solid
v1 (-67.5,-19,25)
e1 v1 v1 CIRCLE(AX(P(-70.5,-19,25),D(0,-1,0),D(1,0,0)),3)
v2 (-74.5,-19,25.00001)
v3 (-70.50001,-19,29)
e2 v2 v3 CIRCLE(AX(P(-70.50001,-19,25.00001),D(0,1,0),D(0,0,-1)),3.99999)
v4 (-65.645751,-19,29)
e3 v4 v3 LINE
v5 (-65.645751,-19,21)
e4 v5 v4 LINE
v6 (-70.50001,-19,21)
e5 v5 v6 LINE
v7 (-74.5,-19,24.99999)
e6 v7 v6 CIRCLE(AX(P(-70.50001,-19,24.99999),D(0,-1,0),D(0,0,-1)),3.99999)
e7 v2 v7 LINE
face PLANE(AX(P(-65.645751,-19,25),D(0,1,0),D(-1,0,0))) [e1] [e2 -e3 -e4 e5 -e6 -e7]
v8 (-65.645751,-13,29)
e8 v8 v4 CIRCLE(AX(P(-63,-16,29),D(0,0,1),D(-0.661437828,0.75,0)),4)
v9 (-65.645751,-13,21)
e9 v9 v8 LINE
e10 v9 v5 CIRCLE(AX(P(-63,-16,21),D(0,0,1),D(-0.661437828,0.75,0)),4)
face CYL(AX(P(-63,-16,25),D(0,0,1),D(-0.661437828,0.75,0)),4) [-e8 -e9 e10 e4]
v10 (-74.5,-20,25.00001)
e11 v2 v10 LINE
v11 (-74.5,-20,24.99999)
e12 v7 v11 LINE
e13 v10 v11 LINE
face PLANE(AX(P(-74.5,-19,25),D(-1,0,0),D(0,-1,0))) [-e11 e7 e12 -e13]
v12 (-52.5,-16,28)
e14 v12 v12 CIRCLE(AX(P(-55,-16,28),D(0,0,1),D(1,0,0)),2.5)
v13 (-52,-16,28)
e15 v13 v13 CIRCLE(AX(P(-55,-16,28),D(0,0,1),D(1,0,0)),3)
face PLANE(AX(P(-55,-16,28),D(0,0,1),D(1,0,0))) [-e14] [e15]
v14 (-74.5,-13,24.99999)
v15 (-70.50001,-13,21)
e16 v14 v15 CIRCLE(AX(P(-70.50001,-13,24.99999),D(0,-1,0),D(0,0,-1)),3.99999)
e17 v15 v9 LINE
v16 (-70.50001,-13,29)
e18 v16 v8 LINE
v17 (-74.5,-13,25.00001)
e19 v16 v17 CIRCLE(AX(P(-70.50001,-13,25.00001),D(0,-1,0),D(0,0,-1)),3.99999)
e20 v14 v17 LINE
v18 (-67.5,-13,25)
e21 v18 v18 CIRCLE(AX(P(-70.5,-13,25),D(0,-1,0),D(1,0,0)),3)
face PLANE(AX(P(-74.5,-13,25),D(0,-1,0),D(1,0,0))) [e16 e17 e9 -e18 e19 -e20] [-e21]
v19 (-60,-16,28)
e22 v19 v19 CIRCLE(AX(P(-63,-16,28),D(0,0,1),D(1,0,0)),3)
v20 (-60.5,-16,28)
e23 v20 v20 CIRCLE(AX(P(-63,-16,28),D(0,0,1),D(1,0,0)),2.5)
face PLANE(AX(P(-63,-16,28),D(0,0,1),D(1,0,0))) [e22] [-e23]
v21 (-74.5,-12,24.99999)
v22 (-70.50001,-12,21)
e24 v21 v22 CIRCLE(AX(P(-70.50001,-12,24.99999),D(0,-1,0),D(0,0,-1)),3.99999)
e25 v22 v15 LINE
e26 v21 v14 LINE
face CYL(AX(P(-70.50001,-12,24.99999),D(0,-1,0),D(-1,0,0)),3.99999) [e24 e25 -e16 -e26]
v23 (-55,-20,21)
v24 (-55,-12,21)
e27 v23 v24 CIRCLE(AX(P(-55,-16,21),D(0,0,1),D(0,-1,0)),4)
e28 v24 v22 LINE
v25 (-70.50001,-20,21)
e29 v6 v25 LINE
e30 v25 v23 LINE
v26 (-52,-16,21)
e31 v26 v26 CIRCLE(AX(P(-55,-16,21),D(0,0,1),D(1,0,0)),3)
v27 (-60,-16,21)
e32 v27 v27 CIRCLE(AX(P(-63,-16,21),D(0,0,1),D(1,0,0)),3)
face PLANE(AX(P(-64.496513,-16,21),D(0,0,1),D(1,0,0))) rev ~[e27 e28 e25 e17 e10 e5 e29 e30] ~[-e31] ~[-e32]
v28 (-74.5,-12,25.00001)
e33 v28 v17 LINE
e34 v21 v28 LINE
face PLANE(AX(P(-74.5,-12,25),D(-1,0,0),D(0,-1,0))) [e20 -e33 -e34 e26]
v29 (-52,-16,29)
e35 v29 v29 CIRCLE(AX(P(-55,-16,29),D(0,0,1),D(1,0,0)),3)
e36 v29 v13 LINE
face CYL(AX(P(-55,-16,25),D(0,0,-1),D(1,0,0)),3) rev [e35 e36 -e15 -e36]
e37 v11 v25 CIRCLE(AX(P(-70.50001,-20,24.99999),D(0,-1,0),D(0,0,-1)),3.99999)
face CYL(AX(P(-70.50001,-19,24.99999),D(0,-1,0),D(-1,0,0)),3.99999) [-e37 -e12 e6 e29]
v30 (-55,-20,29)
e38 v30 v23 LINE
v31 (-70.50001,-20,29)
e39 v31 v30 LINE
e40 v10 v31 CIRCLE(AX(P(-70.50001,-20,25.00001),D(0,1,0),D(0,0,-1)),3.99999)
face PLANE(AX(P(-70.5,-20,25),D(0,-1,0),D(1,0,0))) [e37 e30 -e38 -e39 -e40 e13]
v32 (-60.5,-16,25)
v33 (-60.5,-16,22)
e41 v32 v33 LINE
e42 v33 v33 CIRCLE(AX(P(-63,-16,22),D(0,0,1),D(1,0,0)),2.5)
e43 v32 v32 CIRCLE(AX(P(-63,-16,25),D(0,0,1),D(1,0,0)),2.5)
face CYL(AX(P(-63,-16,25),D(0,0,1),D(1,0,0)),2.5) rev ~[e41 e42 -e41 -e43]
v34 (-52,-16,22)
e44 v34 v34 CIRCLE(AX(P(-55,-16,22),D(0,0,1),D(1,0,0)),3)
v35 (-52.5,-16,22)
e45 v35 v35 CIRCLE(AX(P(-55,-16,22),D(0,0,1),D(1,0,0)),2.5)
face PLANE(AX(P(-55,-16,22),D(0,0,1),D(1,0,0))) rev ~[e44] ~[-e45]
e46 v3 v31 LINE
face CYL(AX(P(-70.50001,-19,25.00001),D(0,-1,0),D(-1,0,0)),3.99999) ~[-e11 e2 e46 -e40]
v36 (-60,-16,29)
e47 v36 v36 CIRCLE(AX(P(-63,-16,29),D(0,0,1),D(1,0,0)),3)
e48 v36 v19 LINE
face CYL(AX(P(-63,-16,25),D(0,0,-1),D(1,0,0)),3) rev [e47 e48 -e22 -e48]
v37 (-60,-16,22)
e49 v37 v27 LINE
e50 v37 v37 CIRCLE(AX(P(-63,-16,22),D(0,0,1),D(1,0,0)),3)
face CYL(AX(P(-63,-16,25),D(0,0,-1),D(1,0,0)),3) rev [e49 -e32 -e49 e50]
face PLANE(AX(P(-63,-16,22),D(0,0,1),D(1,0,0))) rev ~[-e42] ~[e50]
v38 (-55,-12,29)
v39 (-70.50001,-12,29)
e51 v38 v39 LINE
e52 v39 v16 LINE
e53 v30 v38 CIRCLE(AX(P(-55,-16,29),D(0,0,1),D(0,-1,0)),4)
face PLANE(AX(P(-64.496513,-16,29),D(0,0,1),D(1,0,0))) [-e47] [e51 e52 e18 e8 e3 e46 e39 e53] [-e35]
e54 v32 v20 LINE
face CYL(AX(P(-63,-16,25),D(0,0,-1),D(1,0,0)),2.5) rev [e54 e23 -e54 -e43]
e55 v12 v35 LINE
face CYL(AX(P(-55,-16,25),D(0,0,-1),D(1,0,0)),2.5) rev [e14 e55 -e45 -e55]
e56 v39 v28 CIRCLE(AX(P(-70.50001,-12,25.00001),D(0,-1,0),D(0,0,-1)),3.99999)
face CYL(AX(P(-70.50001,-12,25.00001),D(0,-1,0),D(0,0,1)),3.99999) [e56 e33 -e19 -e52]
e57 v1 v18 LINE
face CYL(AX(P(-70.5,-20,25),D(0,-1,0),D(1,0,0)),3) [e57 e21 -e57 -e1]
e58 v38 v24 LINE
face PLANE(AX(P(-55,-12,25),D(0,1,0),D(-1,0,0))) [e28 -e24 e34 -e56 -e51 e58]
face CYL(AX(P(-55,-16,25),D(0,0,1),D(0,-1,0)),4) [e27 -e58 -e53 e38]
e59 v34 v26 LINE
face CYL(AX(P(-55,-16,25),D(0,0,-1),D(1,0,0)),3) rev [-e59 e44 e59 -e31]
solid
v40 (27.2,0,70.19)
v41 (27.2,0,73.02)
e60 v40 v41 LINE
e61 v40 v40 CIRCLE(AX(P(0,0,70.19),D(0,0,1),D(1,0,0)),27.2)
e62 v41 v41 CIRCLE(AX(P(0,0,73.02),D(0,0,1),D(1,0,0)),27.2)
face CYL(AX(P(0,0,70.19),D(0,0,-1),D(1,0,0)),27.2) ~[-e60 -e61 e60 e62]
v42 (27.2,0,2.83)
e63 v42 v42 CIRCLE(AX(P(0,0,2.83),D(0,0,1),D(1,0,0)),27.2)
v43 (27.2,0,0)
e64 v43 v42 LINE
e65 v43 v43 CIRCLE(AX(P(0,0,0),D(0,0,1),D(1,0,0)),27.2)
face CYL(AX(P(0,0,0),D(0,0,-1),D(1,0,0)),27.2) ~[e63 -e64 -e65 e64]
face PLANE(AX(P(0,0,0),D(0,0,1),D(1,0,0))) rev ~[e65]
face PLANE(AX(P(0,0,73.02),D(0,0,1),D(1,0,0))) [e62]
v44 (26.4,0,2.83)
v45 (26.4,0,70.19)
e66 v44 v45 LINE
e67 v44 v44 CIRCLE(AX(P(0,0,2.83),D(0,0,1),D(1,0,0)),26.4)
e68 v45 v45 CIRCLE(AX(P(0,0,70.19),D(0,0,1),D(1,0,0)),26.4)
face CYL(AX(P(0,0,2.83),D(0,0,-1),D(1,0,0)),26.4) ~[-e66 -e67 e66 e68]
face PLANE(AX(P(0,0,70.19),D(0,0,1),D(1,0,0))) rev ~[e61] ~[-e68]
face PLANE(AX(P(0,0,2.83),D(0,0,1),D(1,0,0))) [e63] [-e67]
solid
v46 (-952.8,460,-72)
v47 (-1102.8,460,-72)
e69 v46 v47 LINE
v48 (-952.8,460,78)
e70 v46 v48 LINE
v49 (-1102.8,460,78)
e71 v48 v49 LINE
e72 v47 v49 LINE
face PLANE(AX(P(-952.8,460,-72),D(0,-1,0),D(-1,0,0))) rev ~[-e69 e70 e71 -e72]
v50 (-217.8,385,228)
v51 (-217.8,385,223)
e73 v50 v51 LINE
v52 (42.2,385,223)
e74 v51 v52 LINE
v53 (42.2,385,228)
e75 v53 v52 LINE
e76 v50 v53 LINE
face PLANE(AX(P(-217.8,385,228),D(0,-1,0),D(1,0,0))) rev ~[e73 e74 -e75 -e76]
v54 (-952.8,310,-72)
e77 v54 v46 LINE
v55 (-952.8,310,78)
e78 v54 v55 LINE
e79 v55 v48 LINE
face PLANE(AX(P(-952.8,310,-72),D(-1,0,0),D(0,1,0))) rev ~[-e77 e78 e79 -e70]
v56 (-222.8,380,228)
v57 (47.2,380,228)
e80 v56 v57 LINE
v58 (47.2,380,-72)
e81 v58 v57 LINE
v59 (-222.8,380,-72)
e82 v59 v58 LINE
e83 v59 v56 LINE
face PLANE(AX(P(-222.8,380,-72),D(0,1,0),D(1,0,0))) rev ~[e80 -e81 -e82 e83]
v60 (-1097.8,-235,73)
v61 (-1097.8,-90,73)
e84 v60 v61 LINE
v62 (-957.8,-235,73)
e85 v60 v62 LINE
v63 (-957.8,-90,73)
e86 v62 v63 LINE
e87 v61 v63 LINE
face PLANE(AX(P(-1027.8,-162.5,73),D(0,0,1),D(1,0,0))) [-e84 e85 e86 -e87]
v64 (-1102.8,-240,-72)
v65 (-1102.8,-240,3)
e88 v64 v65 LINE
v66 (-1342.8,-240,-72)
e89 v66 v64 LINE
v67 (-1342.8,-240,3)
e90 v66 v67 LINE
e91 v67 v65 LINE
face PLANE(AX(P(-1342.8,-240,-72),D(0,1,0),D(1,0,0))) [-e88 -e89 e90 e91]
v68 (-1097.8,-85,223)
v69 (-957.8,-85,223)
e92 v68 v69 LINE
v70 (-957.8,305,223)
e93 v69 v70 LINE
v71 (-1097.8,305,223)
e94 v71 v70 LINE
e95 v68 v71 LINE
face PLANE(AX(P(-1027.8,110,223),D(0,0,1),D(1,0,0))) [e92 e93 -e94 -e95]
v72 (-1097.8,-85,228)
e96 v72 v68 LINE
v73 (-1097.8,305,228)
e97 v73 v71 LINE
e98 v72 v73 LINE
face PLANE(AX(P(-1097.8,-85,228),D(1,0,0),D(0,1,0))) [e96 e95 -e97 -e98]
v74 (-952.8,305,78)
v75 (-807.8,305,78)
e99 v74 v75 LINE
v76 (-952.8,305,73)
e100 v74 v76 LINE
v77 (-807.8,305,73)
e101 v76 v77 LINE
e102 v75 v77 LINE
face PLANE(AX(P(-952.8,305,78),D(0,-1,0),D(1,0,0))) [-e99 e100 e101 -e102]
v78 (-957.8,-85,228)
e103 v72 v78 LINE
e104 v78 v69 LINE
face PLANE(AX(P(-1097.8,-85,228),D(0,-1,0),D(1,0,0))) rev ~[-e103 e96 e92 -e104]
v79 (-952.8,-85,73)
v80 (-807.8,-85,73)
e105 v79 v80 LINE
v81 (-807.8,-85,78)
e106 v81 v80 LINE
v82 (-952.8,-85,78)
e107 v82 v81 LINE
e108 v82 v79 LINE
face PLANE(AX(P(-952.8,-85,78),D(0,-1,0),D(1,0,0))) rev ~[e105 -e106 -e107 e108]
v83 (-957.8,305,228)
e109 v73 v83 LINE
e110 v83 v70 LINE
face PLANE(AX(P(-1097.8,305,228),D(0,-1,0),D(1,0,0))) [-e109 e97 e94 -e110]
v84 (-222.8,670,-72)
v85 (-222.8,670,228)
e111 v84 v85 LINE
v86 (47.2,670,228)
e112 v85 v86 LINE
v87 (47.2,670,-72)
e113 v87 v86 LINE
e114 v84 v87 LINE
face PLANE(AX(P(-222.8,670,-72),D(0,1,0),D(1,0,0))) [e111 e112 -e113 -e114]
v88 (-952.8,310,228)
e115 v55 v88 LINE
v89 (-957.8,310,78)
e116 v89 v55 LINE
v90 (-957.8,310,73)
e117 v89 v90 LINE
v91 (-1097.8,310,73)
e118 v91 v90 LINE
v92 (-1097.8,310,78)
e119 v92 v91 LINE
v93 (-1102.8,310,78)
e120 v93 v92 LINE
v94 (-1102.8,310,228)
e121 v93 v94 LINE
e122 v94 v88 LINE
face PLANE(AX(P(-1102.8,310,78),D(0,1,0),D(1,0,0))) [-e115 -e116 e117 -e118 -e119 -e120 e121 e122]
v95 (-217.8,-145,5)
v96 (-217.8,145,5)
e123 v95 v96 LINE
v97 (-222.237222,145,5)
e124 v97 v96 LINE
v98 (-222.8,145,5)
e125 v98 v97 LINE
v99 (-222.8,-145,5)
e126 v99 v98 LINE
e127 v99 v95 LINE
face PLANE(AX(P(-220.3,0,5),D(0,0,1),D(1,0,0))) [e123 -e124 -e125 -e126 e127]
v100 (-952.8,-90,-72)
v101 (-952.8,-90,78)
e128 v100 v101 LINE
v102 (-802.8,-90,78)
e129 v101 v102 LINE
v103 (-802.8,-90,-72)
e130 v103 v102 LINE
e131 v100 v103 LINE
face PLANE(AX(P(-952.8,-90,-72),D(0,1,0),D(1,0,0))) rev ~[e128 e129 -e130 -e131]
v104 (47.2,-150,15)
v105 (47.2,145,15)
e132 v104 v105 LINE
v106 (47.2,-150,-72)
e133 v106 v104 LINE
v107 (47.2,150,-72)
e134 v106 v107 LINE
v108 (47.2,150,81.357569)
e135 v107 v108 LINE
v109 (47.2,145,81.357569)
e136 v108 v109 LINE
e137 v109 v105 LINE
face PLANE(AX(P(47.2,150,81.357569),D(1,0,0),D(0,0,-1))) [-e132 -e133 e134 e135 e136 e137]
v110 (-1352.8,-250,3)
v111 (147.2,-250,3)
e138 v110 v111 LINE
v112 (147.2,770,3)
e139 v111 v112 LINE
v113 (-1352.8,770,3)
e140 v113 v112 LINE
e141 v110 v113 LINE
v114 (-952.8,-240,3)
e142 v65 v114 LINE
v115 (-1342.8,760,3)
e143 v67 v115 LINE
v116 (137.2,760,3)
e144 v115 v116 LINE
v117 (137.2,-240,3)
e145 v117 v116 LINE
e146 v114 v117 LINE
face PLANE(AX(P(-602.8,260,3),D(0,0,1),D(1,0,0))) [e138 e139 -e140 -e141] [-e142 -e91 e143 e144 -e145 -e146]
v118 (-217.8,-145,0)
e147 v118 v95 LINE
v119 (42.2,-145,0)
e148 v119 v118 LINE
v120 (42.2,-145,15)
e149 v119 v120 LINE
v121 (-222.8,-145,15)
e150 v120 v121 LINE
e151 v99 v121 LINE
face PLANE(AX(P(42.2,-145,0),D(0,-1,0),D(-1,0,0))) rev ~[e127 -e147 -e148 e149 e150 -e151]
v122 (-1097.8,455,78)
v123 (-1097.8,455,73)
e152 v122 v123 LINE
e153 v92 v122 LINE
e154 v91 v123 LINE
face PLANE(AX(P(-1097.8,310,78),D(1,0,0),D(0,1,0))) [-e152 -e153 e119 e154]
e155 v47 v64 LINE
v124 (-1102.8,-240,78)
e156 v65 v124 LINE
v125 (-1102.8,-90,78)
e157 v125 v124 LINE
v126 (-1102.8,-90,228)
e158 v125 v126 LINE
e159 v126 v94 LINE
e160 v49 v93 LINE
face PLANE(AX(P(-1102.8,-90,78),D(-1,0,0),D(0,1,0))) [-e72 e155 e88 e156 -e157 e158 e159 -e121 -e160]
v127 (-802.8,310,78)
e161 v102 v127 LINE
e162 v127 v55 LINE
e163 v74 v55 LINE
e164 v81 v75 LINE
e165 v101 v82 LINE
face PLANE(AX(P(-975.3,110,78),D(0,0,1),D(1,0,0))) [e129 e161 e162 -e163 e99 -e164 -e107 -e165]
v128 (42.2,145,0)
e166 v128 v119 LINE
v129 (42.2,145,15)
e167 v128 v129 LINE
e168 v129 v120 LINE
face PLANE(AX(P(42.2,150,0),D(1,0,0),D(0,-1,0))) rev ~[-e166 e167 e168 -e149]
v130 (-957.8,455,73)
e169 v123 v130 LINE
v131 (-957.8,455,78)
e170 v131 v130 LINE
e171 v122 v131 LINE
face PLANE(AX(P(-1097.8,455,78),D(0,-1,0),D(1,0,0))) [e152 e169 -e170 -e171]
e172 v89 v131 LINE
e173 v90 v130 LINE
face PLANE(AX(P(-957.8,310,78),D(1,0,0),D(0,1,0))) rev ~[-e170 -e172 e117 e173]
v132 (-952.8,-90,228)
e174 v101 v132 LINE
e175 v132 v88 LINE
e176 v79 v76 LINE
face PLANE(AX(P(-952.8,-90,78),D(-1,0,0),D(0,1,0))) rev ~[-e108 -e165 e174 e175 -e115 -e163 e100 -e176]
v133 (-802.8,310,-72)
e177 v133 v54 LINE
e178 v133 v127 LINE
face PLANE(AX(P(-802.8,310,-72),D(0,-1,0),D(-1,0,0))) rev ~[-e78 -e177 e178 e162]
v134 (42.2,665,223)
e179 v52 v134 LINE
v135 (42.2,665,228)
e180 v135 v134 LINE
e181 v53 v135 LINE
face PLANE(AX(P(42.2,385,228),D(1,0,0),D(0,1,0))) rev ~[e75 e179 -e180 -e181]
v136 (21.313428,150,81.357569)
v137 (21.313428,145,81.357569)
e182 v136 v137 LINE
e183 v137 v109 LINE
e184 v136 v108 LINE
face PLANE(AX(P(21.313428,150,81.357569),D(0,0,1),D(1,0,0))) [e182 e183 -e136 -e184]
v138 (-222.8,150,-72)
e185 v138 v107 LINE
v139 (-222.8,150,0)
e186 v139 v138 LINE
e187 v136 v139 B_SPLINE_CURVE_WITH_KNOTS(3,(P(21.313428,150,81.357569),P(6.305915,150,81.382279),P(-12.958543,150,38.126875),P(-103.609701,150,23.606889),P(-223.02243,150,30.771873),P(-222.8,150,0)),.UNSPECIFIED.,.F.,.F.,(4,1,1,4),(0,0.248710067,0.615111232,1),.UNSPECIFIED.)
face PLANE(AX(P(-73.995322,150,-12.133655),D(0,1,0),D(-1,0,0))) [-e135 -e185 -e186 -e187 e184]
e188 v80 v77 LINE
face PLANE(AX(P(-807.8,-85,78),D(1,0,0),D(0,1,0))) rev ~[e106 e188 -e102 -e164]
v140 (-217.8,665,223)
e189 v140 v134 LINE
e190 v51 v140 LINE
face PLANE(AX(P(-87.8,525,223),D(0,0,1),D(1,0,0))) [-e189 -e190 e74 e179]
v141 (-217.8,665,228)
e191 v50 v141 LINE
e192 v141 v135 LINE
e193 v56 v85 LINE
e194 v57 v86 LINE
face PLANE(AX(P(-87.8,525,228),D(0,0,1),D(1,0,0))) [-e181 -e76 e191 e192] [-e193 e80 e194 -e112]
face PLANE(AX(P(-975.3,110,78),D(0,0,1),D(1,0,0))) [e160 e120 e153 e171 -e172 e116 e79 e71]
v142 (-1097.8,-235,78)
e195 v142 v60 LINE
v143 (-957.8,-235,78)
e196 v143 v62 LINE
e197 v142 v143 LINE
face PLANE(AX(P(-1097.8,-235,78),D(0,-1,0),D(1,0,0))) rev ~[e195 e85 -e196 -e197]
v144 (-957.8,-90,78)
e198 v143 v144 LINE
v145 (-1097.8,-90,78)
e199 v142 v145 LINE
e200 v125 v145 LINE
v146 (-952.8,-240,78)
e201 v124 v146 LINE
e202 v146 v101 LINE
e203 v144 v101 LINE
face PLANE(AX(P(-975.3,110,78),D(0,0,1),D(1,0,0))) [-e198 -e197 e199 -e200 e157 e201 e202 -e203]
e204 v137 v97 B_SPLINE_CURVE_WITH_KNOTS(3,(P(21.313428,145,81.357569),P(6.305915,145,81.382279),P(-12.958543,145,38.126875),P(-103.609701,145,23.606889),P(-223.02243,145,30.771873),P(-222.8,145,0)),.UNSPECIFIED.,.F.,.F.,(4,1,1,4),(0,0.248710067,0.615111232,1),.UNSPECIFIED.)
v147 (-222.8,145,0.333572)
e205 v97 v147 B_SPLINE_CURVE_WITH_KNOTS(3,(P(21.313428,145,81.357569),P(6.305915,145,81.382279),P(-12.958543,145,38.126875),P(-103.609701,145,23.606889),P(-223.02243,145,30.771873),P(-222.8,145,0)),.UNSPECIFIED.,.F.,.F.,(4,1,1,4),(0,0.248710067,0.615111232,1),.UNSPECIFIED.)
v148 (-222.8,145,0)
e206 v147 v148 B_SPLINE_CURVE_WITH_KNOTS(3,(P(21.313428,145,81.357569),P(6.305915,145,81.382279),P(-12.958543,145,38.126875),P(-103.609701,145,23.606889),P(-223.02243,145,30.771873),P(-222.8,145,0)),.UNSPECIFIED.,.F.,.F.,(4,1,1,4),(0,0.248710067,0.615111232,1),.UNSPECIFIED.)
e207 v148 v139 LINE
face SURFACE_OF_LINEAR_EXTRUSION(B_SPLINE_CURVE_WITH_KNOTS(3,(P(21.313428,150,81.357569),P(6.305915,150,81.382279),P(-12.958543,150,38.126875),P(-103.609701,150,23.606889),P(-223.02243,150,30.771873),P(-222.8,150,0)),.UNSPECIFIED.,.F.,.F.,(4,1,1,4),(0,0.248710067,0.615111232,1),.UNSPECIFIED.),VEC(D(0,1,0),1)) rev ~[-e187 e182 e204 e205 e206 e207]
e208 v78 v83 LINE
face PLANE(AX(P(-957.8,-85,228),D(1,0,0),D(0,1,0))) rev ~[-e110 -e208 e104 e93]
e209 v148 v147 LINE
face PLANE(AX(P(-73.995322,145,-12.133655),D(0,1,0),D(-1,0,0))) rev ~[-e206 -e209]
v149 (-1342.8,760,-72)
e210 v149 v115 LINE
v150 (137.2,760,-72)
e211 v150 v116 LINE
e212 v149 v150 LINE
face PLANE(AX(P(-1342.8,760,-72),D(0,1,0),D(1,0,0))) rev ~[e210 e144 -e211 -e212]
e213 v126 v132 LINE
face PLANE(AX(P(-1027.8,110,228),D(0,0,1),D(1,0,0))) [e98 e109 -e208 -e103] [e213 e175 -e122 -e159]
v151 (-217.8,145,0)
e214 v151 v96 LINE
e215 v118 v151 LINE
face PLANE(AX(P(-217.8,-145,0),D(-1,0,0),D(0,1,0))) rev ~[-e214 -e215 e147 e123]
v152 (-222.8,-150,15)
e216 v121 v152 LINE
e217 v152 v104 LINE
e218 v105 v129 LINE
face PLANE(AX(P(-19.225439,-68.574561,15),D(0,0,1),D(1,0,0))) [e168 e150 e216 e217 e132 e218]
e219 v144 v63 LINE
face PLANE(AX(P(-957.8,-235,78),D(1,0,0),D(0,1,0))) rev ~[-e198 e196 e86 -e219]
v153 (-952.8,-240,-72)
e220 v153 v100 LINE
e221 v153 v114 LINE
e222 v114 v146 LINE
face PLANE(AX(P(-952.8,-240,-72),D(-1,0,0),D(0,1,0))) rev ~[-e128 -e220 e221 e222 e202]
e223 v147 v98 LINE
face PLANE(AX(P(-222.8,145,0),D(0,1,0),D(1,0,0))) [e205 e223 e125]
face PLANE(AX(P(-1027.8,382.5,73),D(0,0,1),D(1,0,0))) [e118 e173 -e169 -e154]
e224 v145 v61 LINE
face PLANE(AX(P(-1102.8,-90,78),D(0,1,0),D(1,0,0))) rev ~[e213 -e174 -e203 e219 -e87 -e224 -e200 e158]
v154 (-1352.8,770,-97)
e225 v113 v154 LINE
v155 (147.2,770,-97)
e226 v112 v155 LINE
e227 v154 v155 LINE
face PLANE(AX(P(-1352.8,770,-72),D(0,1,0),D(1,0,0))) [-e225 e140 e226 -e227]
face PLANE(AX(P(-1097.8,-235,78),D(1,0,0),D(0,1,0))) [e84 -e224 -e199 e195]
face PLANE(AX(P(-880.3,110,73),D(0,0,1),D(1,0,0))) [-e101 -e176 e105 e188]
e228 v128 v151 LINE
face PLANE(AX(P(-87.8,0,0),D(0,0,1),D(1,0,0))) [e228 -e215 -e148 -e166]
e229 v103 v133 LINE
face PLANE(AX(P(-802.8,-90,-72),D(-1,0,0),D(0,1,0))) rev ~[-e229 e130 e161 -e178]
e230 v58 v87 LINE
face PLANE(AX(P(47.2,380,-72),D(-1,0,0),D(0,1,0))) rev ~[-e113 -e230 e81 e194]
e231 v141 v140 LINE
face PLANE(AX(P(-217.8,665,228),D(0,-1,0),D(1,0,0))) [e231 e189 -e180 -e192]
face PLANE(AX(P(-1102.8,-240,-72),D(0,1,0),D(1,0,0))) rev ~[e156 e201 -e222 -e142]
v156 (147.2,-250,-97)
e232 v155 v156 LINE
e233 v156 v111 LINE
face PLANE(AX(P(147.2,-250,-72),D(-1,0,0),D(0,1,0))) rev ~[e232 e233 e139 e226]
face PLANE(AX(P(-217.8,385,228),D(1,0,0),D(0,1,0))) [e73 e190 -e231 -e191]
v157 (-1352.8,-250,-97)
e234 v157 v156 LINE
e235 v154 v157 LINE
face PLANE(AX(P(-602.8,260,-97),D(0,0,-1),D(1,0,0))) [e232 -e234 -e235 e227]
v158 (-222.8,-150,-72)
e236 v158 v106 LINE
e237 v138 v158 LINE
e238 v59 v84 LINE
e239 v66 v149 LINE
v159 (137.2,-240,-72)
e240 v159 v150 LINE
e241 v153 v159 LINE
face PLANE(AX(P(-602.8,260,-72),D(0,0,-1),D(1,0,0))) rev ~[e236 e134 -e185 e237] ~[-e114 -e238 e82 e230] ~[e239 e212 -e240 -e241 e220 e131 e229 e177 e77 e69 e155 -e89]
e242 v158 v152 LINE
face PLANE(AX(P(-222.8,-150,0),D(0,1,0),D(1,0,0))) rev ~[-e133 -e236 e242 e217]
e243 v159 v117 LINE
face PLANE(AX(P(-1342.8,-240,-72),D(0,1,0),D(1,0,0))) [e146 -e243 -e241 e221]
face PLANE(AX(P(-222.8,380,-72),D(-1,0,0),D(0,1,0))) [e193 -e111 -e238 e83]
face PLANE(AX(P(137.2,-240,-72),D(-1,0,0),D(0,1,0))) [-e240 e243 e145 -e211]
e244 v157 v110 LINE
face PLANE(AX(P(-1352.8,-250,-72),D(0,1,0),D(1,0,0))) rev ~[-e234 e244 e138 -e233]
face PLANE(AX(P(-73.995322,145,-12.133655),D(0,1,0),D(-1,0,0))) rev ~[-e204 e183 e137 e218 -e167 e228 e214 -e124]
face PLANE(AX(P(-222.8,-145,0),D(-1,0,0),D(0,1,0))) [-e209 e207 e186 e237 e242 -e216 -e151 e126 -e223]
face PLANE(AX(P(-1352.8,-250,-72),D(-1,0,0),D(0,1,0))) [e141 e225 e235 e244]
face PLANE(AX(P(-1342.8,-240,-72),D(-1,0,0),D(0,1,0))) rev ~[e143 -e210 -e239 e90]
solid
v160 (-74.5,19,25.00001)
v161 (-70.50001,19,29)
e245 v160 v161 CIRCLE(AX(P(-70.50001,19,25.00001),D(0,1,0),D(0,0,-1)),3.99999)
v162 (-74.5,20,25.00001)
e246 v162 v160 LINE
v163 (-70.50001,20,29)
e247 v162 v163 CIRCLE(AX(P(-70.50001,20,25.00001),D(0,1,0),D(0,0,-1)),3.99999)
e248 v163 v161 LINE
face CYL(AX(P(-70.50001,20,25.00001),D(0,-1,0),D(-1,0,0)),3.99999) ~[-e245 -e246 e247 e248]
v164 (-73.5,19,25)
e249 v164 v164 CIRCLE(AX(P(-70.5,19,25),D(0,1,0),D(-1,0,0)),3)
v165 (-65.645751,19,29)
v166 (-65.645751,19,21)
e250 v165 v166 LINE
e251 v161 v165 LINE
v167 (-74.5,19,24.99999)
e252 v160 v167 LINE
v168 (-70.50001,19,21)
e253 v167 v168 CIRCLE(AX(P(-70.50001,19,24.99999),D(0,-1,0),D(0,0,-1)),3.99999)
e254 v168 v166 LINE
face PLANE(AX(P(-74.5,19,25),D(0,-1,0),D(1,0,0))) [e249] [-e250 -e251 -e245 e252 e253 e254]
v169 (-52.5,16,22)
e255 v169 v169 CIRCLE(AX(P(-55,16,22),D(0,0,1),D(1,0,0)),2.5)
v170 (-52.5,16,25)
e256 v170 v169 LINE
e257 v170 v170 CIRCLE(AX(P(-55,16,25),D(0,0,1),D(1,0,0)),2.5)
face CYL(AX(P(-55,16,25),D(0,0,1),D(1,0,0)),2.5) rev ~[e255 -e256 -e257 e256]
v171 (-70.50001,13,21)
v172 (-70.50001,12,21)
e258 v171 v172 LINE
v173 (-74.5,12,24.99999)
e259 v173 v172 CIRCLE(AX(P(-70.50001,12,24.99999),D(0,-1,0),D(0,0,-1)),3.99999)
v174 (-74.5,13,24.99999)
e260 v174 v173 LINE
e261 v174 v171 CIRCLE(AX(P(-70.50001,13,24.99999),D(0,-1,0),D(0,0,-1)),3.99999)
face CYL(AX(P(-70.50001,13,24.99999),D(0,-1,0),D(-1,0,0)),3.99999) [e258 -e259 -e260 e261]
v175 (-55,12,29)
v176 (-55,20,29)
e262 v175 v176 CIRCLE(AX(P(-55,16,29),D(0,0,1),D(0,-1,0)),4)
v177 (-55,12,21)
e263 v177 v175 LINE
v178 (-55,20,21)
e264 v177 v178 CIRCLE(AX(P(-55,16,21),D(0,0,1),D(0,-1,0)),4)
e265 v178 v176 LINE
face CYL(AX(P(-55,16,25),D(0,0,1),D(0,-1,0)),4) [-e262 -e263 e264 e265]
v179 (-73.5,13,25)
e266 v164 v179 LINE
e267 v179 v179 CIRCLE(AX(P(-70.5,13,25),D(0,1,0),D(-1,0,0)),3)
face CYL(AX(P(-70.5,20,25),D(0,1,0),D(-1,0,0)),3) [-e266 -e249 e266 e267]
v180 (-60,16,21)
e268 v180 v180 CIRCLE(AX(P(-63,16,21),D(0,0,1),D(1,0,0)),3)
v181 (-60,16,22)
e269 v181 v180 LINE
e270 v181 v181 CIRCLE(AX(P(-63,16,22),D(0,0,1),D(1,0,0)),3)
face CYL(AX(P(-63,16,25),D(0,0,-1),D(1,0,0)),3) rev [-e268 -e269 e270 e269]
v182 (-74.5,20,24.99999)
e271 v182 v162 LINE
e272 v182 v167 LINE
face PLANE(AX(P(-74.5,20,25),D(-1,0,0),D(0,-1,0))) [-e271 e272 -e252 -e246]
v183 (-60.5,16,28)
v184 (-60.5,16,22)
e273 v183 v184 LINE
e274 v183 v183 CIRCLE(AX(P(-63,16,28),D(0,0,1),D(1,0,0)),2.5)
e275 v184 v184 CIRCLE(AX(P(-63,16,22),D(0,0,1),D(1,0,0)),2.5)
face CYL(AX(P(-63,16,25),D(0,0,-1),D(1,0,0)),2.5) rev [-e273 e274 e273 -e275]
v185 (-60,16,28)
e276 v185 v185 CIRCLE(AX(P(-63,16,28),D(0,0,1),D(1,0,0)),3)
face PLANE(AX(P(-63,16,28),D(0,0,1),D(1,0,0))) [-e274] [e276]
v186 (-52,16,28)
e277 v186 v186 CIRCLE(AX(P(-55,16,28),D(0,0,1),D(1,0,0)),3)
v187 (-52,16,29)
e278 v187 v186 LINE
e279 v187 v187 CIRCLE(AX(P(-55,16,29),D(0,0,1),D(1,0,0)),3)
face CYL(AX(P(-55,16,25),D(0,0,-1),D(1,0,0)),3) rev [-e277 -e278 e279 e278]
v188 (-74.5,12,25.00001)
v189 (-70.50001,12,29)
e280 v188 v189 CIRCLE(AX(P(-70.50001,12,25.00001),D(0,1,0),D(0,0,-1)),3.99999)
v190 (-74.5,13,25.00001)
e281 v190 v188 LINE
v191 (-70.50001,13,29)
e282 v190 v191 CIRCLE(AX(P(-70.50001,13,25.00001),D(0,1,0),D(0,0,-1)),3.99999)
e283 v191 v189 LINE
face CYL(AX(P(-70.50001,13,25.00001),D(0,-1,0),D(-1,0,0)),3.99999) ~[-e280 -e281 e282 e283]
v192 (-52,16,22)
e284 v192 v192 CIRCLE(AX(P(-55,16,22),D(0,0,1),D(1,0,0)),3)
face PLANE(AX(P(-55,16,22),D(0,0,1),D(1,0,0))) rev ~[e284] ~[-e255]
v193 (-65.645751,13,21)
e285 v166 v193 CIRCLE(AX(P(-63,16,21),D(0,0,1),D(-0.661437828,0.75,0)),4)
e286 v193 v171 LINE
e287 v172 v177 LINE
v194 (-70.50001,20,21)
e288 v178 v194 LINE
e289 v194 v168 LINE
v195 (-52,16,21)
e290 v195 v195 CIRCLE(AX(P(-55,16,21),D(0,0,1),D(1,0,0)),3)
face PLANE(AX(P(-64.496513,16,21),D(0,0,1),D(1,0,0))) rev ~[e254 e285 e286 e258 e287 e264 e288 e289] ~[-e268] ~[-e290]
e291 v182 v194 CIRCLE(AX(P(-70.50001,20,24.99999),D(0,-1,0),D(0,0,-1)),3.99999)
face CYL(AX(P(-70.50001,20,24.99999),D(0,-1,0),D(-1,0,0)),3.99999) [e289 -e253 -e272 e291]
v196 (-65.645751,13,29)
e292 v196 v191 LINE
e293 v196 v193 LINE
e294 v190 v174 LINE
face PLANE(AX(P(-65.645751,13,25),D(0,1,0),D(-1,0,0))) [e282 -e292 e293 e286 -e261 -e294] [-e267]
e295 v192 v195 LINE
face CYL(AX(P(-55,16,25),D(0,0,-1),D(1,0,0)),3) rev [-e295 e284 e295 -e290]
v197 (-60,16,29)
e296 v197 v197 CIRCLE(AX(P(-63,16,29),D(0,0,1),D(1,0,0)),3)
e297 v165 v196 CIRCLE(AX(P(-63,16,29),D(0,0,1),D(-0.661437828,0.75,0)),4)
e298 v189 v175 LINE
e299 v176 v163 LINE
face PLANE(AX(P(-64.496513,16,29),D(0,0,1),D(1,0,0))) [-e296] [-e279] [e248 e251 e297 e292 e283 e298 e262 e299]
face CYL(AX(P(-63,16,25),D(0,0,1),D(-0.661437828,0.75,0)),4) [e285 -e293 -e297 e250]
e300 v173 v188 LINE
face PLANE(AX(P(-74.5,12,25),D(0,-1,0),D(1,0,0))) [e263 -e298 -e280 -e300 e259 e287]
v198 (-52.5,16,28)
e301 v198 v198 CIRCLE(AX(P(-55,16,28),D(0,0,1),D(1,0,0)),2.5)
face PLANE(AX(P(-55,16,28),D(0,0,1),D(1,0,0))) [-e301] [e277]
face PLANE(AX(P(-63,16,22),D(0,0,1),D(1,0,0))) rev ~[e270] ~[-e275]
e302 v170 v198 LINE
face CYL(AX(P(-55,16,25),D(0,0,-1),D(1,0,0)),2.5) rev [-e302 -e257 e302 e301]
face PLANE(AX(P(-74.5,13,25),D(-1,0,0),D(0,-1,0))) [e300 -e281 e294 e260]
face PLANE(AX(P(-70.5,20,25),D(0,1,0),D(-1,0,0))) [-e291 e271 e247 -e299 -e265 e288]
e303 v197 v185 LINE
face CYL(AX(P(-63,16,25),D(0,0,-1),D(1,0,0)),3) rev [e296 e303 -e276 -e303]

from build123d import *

# Parameters (mm, degrees)
F0_R      = 27.2
F1_DEPTH  = 2.83
F2_R      = 26.4
F3_DEPTH  = 67.36
F4_R      = 27.2
F5_DEPTH  = 2.83
F8_W      = 270
F8_H      = 300
F9_DEPTH  = 72
F11_DEPTH = 15
F13_DEPTH = 5
F14_W     = 5
F14_H     = 290
F15_DEPTH = 5
F16_W     = 1500
F16_H     = 1020
F17_DEPTH = 25
F18_W     = 270
F18_H     = 290
F19_DEPTH = 300
F20_W     = 260
F20_H     = 280
F21_DEPTH = 5
F22_W     = 1500
F22_H     = 1020
F22_W_2   = 1480
F22_H_2   = 1000
F23_DEPTH = 75
F25_DEPTH = 150
F26_W     = 150
F26_H     = 400
F27_DEPTH = 150
F28_W     = 140
F28_H     = 390
F29_DEPTH = 5
F30_W     = 140
F30_H     = 145
F30_W_2   = 145
F30_H_2   = 390
F31_DEPTH = 5
F32_R     = 3
F33_DEPTH = 4
F34_R     = 3.99999
F34_2_R   = 3.99999
F35_R     = 3
F36_DEPTH = 8
F37_R     = 3
F38_DEPTH = 8
F39_R     = 3
F39_R_2   = 2.5
F40_DEPTH = 3
F41_R     = 3
F41_R_2   = 2.5
F42_DEPTH = 3


# Not quite as in the source:
# - a fillet or chamfer is up to 0.001 mm smaller than in the source, because OpenCascade refuses the exact size
# - a feature names something its author has since deleted; it is built from what else it names


with BuildPart() as f1:
    # F0 (on Top) → F1 (new body)
    with BuildSketch(Plane.XY):
        Circle(F0_R)
    extrude(amount=F1_DEPTH)

    # F2 (on face) → F3 (join)
    with BuildSketch(Plane.XY.offset(2.83)):
        Circle(F2_R)
    extrude(amount=F3_DEPTH)

    # F4 (on face) → F5 (join)
    with BuildSketch(Plane.XY.offset(70.19)):
        Circle(F4_R)
    extrude(amount=F5_DEPTH)


with BuildPart() as f9:
    # F8 (on Top) → F9 (new body)
    with BuildSketch(Plane.XY):
        with Locations((-87.8, 0)):
            Rectangle(F8_W, F8_H)
    extrude(amount=-F9_DEPTH)

    # F10 (on face) → F11 (join)
    with BuildSketch(Plane.XY):
        Polygon((-222.8, -145), (-222.8, -150), (47.2, -150), (47.2, 150), (42.2, 150), (42.2, -145), align=None)
    extrude(amount=F11_DEPTH)

    # F12 (on face) → F13 (join)
    with BuildSketch(Plane(origin=(0, 150, 0), x_dir=(-1, 0, 0), z_dir=(0, 1, 0))):
        with BuildLine():
            Line((-21.3134280931, 81.3575685024), (-47.2, 81.3575685024))
            Line((-47.2, 81.3575685024), (-47.2, -72))
            Line((-47.2, -72), (222.8, -72))
            Line((222.8, -72), (222.8, 0))
            add(Edge.make_bspline(
                [(-21.3134280931, 81.3575685024), (-6.3059147253, 81.3822787863), (12.9585432644, 38.1268753575), (103.6097013063, 23.6068887567), (223.0224295336, 30.7718731823), (222.8, 0)],
                knots=[0, 0, 0, 0, 0.2487100673, 0.6151112321, 1, 1, 1, 1], degree=3))
        make_face()
    extrude(amount=-F13_DEPTH)

    # F14 (on face) → F15 (join)
    with BuildSketch(Plane.XY):
        with Locations((-220.3, 0)):
            Rectangle(F14_W, F14_H)
    extrude(amount=F15_DEPTH)

    # F16 (on face) → F17 (join)
    with BuildSketch(Plane(origin=(0, 0, -72), x_dir=(1, 0, 0), z_dir=(0, 0, -1))):
        with Locations((-602.8, -260)):
            Rectangle(F16_W, F16_H)
    extrude(amount=F17_DEPTH)

    # F18 (on face) → F19 (join)
    with BuildSketch(Plane.XY.offset(-72)):
        with Locations((-87.8, 525)):
            Rectangle(F18_W, F18_H)
    extrude(amount=F19_DEPTH)

    # F20 (on face) → F21 (cut)
    with BuildSketch(Plane.XY.offset(228)):
        with Locations((-87.8, 525)):
            Rectangle(F20_W, F20_H)
    extrude(amount=-F21_DEPTH, mode=Mode.SUBTRACT)

    # F22 (on face) → F23 (join)
    with BuildSketch(Plane.XY.offset(-72)):
        with Locations((-602.8, 260)):
            Rectangle(F22_W, F22_H)
        with Locations((-602.8, 260)):
            Rectangle(F22_W_2, F22_H_2, mode=Mode.SUBTRACT)
    extrude(amount=F23_DEPTH)

    # F24 (on face) → F25 (join)
    with BuildSketch(Plane.XY.offset(-72)):
        Polygon((-952.8, 460), (-1102.8, 460), (-1102.8, -240), (-952.8, -240), (-952.8, -90), (-802.8, -90), (-802.8, 310), (-952.8, 310), align=None)
    extrude(amount=F25_DEPTH)

    # F26 (on face) → F27 (join)
    with BuildSketch(Plane.XY.offset(78)):
        with Locations((-1027.8, 110)):
            Rectangle(F26_W, F26_H)
    extrude(amount=F27_DEPTH)

    # F28 (on face) → F29 (cut)
    with BuildSketch(Plane.XY.offset(228)):
        with Locations((-1027.8, 110)):
            Rectangle(F28_W, F28_H)
    extrude(amount=-F29_DEPTH, mode=Mode.SUBTRACT)

    # F30 (on face) → F31 (cut)
    with BuildSketch(Plane.XY.offset(78)):
        with Locations((-1027.8, 382.5)):
            Rectangle(F30_W, F30_H)
        with Locations((-880.3, 110)):
            Rectangle(F30_W_2, F30_H_2)
        with Locations((-1027.8, -162.5)):
            Rectangle(F30_W, F30_H)
    extrude(amount=-F31_DEPTH, mode=Mode.SUBTRACT)


with BuildPart() as f33:
    # F32 (on offset) → F33 (new body, symmetric)
    with BuildSketch(Plane.XY.offset(25)):
        with BuildLine():
            Line((-55, -12), (-74.5, -12))
            Line((-74.5, -12), (-74.5, -13))
            Line((-74.5, -13), (-65.6457513111, -13))
            ThreePointArc((-65.6457513111, -13), (-67, -16), (-65.6457513111, -19))
            Line((-65.6457513111, -19), (-74.5, -19))
            Line((-74.5, -19), (-74.5, -20))
            Line((-74.5, -20), (-55, -20))
            ThreePointArc((-55, -20), (-51, -16), (-55, -12))
        make_face()
        with Locations((-63, -16)):
            Circle(F32_R, mode=Mode.SUBTRACT)
        with Locations((-55, -16)):
            Circle(F32_R, mode=Mode.SUBTRACT)
    extrude(amount=F33_DEPTH, both=True)

    # F34 (radius 4 in the source; OpenCascade refuses exactly that, so slightly less here)
    f34_edges = [f33.edges().sort_by_distance(p)[0] for p in [
        (-74.5, -19.5, 29),
        (-74.5, -12.5, 29),
        (-74.5, -19.5, 21),
        (-74.5, -12.5, 21),
    ]]
    fillet(f34_edges, radius=F34_R)

    # F35 (on face) → F36 (join, through all)
    with BuildSketch(Plane.XZ.offset(20)):
        with Locations((-70.5, 25)):
            Circle(F35_R)
    extrude(amount=-F36_DEPTH)

    # F41 (on offset) → F42 (join, symmetric)
    with BuildSketch(Plane.XY.offset(25)):
        with Locations((-63, -16)):
            Circle(F41_R)
        with Locations((-63, -16)):
            Circle(F41_R_2, mode=Mode.SUBTRACT)
        with Locations((-55, -16)):
            Circle(F41_R)
        with Locations((-55, -16)):
            Circle(F41_R_2, mode=Mode.SUBTRACT)
    extrude(amount=F42_DEPTH, both=True)


with BuildPart() as f33b:
    # F32 (on offset) → F33, piece 2 (new body, symmetric)
    with BuildSketch(Plane.XY.offset(25)):
        with BuildLine():
            Line((-74.5, 13), (-74.5, 12))
            Line((-74.5, 12), (-55, 12))
            ThreePointArc((-55, 12), (-51, 16), (-55, 20))
            Line((-55, 20), (-74.5, 20))
            Line((-74.5, 20), (-74.5, 19))
            Line((-74.5, 19), (-65.6457513111, 19))
            ThreePointArc((-65.6457513111, 19), (-67, 16), (-65.6457513111, 13))
            Line((-65.6457513111, 13), (-74.5, 13))
        make_face()
        with Locations((-63, 16)):
            Circle(F32_R, mode=Mode.SUBTRACT)
        with Locations((-55, 16)):
            Circle(F32_R, mode=Mode.SUBTRACT)
    extrude(amount=F33_DEPTH, both=True)

    # F34#2 (radius 4 in the source; OpenCascade refuses exactly that, so slightly less here)
    f34_2_edges = [f33b.edges().sort_by_distance(p)[0] for p in [
        (-74.5, 12.5, 29),
        (-74.5, 19.5, 29),
        (-74.5, 19.5, 21),
        (-74.5, 12.5, 21),
    ]]
    fillet(f34_2_edges, radius=F34_2_R)

    # F37 (on face) → F38 (join, through all)
    with BuildSketch(Plane(origin=(0, 20, 0), x_dir=(-1, 0, 0), z_dir=(0, 1, 0))):
        with Locations((70.5, 25)):
            Circle(F37_R)
    extrude(amount=-F38_DEPTH)

    # F39 (on offset) → F40 (join, symmetric)
    with BuildSketch(Plane.XY.offset(25)):
        with Locations((-55, 16)):
            Circle(F39_R)
        with Locations((-55, 16)):
            Circle(F39_R_2, mode=Mode.SUBTRACT)
        with Locations((-63, 16)):
            Circle(F39_R)
        with Locations((-63, 16)):
            Circle(F39_R_2, mode=Mode.SUBTRACT)
    extrude(amount=F40_DEPTH, both=True)


solid = Compound([f1.part, f9.part, f33.part, f33b.part])
